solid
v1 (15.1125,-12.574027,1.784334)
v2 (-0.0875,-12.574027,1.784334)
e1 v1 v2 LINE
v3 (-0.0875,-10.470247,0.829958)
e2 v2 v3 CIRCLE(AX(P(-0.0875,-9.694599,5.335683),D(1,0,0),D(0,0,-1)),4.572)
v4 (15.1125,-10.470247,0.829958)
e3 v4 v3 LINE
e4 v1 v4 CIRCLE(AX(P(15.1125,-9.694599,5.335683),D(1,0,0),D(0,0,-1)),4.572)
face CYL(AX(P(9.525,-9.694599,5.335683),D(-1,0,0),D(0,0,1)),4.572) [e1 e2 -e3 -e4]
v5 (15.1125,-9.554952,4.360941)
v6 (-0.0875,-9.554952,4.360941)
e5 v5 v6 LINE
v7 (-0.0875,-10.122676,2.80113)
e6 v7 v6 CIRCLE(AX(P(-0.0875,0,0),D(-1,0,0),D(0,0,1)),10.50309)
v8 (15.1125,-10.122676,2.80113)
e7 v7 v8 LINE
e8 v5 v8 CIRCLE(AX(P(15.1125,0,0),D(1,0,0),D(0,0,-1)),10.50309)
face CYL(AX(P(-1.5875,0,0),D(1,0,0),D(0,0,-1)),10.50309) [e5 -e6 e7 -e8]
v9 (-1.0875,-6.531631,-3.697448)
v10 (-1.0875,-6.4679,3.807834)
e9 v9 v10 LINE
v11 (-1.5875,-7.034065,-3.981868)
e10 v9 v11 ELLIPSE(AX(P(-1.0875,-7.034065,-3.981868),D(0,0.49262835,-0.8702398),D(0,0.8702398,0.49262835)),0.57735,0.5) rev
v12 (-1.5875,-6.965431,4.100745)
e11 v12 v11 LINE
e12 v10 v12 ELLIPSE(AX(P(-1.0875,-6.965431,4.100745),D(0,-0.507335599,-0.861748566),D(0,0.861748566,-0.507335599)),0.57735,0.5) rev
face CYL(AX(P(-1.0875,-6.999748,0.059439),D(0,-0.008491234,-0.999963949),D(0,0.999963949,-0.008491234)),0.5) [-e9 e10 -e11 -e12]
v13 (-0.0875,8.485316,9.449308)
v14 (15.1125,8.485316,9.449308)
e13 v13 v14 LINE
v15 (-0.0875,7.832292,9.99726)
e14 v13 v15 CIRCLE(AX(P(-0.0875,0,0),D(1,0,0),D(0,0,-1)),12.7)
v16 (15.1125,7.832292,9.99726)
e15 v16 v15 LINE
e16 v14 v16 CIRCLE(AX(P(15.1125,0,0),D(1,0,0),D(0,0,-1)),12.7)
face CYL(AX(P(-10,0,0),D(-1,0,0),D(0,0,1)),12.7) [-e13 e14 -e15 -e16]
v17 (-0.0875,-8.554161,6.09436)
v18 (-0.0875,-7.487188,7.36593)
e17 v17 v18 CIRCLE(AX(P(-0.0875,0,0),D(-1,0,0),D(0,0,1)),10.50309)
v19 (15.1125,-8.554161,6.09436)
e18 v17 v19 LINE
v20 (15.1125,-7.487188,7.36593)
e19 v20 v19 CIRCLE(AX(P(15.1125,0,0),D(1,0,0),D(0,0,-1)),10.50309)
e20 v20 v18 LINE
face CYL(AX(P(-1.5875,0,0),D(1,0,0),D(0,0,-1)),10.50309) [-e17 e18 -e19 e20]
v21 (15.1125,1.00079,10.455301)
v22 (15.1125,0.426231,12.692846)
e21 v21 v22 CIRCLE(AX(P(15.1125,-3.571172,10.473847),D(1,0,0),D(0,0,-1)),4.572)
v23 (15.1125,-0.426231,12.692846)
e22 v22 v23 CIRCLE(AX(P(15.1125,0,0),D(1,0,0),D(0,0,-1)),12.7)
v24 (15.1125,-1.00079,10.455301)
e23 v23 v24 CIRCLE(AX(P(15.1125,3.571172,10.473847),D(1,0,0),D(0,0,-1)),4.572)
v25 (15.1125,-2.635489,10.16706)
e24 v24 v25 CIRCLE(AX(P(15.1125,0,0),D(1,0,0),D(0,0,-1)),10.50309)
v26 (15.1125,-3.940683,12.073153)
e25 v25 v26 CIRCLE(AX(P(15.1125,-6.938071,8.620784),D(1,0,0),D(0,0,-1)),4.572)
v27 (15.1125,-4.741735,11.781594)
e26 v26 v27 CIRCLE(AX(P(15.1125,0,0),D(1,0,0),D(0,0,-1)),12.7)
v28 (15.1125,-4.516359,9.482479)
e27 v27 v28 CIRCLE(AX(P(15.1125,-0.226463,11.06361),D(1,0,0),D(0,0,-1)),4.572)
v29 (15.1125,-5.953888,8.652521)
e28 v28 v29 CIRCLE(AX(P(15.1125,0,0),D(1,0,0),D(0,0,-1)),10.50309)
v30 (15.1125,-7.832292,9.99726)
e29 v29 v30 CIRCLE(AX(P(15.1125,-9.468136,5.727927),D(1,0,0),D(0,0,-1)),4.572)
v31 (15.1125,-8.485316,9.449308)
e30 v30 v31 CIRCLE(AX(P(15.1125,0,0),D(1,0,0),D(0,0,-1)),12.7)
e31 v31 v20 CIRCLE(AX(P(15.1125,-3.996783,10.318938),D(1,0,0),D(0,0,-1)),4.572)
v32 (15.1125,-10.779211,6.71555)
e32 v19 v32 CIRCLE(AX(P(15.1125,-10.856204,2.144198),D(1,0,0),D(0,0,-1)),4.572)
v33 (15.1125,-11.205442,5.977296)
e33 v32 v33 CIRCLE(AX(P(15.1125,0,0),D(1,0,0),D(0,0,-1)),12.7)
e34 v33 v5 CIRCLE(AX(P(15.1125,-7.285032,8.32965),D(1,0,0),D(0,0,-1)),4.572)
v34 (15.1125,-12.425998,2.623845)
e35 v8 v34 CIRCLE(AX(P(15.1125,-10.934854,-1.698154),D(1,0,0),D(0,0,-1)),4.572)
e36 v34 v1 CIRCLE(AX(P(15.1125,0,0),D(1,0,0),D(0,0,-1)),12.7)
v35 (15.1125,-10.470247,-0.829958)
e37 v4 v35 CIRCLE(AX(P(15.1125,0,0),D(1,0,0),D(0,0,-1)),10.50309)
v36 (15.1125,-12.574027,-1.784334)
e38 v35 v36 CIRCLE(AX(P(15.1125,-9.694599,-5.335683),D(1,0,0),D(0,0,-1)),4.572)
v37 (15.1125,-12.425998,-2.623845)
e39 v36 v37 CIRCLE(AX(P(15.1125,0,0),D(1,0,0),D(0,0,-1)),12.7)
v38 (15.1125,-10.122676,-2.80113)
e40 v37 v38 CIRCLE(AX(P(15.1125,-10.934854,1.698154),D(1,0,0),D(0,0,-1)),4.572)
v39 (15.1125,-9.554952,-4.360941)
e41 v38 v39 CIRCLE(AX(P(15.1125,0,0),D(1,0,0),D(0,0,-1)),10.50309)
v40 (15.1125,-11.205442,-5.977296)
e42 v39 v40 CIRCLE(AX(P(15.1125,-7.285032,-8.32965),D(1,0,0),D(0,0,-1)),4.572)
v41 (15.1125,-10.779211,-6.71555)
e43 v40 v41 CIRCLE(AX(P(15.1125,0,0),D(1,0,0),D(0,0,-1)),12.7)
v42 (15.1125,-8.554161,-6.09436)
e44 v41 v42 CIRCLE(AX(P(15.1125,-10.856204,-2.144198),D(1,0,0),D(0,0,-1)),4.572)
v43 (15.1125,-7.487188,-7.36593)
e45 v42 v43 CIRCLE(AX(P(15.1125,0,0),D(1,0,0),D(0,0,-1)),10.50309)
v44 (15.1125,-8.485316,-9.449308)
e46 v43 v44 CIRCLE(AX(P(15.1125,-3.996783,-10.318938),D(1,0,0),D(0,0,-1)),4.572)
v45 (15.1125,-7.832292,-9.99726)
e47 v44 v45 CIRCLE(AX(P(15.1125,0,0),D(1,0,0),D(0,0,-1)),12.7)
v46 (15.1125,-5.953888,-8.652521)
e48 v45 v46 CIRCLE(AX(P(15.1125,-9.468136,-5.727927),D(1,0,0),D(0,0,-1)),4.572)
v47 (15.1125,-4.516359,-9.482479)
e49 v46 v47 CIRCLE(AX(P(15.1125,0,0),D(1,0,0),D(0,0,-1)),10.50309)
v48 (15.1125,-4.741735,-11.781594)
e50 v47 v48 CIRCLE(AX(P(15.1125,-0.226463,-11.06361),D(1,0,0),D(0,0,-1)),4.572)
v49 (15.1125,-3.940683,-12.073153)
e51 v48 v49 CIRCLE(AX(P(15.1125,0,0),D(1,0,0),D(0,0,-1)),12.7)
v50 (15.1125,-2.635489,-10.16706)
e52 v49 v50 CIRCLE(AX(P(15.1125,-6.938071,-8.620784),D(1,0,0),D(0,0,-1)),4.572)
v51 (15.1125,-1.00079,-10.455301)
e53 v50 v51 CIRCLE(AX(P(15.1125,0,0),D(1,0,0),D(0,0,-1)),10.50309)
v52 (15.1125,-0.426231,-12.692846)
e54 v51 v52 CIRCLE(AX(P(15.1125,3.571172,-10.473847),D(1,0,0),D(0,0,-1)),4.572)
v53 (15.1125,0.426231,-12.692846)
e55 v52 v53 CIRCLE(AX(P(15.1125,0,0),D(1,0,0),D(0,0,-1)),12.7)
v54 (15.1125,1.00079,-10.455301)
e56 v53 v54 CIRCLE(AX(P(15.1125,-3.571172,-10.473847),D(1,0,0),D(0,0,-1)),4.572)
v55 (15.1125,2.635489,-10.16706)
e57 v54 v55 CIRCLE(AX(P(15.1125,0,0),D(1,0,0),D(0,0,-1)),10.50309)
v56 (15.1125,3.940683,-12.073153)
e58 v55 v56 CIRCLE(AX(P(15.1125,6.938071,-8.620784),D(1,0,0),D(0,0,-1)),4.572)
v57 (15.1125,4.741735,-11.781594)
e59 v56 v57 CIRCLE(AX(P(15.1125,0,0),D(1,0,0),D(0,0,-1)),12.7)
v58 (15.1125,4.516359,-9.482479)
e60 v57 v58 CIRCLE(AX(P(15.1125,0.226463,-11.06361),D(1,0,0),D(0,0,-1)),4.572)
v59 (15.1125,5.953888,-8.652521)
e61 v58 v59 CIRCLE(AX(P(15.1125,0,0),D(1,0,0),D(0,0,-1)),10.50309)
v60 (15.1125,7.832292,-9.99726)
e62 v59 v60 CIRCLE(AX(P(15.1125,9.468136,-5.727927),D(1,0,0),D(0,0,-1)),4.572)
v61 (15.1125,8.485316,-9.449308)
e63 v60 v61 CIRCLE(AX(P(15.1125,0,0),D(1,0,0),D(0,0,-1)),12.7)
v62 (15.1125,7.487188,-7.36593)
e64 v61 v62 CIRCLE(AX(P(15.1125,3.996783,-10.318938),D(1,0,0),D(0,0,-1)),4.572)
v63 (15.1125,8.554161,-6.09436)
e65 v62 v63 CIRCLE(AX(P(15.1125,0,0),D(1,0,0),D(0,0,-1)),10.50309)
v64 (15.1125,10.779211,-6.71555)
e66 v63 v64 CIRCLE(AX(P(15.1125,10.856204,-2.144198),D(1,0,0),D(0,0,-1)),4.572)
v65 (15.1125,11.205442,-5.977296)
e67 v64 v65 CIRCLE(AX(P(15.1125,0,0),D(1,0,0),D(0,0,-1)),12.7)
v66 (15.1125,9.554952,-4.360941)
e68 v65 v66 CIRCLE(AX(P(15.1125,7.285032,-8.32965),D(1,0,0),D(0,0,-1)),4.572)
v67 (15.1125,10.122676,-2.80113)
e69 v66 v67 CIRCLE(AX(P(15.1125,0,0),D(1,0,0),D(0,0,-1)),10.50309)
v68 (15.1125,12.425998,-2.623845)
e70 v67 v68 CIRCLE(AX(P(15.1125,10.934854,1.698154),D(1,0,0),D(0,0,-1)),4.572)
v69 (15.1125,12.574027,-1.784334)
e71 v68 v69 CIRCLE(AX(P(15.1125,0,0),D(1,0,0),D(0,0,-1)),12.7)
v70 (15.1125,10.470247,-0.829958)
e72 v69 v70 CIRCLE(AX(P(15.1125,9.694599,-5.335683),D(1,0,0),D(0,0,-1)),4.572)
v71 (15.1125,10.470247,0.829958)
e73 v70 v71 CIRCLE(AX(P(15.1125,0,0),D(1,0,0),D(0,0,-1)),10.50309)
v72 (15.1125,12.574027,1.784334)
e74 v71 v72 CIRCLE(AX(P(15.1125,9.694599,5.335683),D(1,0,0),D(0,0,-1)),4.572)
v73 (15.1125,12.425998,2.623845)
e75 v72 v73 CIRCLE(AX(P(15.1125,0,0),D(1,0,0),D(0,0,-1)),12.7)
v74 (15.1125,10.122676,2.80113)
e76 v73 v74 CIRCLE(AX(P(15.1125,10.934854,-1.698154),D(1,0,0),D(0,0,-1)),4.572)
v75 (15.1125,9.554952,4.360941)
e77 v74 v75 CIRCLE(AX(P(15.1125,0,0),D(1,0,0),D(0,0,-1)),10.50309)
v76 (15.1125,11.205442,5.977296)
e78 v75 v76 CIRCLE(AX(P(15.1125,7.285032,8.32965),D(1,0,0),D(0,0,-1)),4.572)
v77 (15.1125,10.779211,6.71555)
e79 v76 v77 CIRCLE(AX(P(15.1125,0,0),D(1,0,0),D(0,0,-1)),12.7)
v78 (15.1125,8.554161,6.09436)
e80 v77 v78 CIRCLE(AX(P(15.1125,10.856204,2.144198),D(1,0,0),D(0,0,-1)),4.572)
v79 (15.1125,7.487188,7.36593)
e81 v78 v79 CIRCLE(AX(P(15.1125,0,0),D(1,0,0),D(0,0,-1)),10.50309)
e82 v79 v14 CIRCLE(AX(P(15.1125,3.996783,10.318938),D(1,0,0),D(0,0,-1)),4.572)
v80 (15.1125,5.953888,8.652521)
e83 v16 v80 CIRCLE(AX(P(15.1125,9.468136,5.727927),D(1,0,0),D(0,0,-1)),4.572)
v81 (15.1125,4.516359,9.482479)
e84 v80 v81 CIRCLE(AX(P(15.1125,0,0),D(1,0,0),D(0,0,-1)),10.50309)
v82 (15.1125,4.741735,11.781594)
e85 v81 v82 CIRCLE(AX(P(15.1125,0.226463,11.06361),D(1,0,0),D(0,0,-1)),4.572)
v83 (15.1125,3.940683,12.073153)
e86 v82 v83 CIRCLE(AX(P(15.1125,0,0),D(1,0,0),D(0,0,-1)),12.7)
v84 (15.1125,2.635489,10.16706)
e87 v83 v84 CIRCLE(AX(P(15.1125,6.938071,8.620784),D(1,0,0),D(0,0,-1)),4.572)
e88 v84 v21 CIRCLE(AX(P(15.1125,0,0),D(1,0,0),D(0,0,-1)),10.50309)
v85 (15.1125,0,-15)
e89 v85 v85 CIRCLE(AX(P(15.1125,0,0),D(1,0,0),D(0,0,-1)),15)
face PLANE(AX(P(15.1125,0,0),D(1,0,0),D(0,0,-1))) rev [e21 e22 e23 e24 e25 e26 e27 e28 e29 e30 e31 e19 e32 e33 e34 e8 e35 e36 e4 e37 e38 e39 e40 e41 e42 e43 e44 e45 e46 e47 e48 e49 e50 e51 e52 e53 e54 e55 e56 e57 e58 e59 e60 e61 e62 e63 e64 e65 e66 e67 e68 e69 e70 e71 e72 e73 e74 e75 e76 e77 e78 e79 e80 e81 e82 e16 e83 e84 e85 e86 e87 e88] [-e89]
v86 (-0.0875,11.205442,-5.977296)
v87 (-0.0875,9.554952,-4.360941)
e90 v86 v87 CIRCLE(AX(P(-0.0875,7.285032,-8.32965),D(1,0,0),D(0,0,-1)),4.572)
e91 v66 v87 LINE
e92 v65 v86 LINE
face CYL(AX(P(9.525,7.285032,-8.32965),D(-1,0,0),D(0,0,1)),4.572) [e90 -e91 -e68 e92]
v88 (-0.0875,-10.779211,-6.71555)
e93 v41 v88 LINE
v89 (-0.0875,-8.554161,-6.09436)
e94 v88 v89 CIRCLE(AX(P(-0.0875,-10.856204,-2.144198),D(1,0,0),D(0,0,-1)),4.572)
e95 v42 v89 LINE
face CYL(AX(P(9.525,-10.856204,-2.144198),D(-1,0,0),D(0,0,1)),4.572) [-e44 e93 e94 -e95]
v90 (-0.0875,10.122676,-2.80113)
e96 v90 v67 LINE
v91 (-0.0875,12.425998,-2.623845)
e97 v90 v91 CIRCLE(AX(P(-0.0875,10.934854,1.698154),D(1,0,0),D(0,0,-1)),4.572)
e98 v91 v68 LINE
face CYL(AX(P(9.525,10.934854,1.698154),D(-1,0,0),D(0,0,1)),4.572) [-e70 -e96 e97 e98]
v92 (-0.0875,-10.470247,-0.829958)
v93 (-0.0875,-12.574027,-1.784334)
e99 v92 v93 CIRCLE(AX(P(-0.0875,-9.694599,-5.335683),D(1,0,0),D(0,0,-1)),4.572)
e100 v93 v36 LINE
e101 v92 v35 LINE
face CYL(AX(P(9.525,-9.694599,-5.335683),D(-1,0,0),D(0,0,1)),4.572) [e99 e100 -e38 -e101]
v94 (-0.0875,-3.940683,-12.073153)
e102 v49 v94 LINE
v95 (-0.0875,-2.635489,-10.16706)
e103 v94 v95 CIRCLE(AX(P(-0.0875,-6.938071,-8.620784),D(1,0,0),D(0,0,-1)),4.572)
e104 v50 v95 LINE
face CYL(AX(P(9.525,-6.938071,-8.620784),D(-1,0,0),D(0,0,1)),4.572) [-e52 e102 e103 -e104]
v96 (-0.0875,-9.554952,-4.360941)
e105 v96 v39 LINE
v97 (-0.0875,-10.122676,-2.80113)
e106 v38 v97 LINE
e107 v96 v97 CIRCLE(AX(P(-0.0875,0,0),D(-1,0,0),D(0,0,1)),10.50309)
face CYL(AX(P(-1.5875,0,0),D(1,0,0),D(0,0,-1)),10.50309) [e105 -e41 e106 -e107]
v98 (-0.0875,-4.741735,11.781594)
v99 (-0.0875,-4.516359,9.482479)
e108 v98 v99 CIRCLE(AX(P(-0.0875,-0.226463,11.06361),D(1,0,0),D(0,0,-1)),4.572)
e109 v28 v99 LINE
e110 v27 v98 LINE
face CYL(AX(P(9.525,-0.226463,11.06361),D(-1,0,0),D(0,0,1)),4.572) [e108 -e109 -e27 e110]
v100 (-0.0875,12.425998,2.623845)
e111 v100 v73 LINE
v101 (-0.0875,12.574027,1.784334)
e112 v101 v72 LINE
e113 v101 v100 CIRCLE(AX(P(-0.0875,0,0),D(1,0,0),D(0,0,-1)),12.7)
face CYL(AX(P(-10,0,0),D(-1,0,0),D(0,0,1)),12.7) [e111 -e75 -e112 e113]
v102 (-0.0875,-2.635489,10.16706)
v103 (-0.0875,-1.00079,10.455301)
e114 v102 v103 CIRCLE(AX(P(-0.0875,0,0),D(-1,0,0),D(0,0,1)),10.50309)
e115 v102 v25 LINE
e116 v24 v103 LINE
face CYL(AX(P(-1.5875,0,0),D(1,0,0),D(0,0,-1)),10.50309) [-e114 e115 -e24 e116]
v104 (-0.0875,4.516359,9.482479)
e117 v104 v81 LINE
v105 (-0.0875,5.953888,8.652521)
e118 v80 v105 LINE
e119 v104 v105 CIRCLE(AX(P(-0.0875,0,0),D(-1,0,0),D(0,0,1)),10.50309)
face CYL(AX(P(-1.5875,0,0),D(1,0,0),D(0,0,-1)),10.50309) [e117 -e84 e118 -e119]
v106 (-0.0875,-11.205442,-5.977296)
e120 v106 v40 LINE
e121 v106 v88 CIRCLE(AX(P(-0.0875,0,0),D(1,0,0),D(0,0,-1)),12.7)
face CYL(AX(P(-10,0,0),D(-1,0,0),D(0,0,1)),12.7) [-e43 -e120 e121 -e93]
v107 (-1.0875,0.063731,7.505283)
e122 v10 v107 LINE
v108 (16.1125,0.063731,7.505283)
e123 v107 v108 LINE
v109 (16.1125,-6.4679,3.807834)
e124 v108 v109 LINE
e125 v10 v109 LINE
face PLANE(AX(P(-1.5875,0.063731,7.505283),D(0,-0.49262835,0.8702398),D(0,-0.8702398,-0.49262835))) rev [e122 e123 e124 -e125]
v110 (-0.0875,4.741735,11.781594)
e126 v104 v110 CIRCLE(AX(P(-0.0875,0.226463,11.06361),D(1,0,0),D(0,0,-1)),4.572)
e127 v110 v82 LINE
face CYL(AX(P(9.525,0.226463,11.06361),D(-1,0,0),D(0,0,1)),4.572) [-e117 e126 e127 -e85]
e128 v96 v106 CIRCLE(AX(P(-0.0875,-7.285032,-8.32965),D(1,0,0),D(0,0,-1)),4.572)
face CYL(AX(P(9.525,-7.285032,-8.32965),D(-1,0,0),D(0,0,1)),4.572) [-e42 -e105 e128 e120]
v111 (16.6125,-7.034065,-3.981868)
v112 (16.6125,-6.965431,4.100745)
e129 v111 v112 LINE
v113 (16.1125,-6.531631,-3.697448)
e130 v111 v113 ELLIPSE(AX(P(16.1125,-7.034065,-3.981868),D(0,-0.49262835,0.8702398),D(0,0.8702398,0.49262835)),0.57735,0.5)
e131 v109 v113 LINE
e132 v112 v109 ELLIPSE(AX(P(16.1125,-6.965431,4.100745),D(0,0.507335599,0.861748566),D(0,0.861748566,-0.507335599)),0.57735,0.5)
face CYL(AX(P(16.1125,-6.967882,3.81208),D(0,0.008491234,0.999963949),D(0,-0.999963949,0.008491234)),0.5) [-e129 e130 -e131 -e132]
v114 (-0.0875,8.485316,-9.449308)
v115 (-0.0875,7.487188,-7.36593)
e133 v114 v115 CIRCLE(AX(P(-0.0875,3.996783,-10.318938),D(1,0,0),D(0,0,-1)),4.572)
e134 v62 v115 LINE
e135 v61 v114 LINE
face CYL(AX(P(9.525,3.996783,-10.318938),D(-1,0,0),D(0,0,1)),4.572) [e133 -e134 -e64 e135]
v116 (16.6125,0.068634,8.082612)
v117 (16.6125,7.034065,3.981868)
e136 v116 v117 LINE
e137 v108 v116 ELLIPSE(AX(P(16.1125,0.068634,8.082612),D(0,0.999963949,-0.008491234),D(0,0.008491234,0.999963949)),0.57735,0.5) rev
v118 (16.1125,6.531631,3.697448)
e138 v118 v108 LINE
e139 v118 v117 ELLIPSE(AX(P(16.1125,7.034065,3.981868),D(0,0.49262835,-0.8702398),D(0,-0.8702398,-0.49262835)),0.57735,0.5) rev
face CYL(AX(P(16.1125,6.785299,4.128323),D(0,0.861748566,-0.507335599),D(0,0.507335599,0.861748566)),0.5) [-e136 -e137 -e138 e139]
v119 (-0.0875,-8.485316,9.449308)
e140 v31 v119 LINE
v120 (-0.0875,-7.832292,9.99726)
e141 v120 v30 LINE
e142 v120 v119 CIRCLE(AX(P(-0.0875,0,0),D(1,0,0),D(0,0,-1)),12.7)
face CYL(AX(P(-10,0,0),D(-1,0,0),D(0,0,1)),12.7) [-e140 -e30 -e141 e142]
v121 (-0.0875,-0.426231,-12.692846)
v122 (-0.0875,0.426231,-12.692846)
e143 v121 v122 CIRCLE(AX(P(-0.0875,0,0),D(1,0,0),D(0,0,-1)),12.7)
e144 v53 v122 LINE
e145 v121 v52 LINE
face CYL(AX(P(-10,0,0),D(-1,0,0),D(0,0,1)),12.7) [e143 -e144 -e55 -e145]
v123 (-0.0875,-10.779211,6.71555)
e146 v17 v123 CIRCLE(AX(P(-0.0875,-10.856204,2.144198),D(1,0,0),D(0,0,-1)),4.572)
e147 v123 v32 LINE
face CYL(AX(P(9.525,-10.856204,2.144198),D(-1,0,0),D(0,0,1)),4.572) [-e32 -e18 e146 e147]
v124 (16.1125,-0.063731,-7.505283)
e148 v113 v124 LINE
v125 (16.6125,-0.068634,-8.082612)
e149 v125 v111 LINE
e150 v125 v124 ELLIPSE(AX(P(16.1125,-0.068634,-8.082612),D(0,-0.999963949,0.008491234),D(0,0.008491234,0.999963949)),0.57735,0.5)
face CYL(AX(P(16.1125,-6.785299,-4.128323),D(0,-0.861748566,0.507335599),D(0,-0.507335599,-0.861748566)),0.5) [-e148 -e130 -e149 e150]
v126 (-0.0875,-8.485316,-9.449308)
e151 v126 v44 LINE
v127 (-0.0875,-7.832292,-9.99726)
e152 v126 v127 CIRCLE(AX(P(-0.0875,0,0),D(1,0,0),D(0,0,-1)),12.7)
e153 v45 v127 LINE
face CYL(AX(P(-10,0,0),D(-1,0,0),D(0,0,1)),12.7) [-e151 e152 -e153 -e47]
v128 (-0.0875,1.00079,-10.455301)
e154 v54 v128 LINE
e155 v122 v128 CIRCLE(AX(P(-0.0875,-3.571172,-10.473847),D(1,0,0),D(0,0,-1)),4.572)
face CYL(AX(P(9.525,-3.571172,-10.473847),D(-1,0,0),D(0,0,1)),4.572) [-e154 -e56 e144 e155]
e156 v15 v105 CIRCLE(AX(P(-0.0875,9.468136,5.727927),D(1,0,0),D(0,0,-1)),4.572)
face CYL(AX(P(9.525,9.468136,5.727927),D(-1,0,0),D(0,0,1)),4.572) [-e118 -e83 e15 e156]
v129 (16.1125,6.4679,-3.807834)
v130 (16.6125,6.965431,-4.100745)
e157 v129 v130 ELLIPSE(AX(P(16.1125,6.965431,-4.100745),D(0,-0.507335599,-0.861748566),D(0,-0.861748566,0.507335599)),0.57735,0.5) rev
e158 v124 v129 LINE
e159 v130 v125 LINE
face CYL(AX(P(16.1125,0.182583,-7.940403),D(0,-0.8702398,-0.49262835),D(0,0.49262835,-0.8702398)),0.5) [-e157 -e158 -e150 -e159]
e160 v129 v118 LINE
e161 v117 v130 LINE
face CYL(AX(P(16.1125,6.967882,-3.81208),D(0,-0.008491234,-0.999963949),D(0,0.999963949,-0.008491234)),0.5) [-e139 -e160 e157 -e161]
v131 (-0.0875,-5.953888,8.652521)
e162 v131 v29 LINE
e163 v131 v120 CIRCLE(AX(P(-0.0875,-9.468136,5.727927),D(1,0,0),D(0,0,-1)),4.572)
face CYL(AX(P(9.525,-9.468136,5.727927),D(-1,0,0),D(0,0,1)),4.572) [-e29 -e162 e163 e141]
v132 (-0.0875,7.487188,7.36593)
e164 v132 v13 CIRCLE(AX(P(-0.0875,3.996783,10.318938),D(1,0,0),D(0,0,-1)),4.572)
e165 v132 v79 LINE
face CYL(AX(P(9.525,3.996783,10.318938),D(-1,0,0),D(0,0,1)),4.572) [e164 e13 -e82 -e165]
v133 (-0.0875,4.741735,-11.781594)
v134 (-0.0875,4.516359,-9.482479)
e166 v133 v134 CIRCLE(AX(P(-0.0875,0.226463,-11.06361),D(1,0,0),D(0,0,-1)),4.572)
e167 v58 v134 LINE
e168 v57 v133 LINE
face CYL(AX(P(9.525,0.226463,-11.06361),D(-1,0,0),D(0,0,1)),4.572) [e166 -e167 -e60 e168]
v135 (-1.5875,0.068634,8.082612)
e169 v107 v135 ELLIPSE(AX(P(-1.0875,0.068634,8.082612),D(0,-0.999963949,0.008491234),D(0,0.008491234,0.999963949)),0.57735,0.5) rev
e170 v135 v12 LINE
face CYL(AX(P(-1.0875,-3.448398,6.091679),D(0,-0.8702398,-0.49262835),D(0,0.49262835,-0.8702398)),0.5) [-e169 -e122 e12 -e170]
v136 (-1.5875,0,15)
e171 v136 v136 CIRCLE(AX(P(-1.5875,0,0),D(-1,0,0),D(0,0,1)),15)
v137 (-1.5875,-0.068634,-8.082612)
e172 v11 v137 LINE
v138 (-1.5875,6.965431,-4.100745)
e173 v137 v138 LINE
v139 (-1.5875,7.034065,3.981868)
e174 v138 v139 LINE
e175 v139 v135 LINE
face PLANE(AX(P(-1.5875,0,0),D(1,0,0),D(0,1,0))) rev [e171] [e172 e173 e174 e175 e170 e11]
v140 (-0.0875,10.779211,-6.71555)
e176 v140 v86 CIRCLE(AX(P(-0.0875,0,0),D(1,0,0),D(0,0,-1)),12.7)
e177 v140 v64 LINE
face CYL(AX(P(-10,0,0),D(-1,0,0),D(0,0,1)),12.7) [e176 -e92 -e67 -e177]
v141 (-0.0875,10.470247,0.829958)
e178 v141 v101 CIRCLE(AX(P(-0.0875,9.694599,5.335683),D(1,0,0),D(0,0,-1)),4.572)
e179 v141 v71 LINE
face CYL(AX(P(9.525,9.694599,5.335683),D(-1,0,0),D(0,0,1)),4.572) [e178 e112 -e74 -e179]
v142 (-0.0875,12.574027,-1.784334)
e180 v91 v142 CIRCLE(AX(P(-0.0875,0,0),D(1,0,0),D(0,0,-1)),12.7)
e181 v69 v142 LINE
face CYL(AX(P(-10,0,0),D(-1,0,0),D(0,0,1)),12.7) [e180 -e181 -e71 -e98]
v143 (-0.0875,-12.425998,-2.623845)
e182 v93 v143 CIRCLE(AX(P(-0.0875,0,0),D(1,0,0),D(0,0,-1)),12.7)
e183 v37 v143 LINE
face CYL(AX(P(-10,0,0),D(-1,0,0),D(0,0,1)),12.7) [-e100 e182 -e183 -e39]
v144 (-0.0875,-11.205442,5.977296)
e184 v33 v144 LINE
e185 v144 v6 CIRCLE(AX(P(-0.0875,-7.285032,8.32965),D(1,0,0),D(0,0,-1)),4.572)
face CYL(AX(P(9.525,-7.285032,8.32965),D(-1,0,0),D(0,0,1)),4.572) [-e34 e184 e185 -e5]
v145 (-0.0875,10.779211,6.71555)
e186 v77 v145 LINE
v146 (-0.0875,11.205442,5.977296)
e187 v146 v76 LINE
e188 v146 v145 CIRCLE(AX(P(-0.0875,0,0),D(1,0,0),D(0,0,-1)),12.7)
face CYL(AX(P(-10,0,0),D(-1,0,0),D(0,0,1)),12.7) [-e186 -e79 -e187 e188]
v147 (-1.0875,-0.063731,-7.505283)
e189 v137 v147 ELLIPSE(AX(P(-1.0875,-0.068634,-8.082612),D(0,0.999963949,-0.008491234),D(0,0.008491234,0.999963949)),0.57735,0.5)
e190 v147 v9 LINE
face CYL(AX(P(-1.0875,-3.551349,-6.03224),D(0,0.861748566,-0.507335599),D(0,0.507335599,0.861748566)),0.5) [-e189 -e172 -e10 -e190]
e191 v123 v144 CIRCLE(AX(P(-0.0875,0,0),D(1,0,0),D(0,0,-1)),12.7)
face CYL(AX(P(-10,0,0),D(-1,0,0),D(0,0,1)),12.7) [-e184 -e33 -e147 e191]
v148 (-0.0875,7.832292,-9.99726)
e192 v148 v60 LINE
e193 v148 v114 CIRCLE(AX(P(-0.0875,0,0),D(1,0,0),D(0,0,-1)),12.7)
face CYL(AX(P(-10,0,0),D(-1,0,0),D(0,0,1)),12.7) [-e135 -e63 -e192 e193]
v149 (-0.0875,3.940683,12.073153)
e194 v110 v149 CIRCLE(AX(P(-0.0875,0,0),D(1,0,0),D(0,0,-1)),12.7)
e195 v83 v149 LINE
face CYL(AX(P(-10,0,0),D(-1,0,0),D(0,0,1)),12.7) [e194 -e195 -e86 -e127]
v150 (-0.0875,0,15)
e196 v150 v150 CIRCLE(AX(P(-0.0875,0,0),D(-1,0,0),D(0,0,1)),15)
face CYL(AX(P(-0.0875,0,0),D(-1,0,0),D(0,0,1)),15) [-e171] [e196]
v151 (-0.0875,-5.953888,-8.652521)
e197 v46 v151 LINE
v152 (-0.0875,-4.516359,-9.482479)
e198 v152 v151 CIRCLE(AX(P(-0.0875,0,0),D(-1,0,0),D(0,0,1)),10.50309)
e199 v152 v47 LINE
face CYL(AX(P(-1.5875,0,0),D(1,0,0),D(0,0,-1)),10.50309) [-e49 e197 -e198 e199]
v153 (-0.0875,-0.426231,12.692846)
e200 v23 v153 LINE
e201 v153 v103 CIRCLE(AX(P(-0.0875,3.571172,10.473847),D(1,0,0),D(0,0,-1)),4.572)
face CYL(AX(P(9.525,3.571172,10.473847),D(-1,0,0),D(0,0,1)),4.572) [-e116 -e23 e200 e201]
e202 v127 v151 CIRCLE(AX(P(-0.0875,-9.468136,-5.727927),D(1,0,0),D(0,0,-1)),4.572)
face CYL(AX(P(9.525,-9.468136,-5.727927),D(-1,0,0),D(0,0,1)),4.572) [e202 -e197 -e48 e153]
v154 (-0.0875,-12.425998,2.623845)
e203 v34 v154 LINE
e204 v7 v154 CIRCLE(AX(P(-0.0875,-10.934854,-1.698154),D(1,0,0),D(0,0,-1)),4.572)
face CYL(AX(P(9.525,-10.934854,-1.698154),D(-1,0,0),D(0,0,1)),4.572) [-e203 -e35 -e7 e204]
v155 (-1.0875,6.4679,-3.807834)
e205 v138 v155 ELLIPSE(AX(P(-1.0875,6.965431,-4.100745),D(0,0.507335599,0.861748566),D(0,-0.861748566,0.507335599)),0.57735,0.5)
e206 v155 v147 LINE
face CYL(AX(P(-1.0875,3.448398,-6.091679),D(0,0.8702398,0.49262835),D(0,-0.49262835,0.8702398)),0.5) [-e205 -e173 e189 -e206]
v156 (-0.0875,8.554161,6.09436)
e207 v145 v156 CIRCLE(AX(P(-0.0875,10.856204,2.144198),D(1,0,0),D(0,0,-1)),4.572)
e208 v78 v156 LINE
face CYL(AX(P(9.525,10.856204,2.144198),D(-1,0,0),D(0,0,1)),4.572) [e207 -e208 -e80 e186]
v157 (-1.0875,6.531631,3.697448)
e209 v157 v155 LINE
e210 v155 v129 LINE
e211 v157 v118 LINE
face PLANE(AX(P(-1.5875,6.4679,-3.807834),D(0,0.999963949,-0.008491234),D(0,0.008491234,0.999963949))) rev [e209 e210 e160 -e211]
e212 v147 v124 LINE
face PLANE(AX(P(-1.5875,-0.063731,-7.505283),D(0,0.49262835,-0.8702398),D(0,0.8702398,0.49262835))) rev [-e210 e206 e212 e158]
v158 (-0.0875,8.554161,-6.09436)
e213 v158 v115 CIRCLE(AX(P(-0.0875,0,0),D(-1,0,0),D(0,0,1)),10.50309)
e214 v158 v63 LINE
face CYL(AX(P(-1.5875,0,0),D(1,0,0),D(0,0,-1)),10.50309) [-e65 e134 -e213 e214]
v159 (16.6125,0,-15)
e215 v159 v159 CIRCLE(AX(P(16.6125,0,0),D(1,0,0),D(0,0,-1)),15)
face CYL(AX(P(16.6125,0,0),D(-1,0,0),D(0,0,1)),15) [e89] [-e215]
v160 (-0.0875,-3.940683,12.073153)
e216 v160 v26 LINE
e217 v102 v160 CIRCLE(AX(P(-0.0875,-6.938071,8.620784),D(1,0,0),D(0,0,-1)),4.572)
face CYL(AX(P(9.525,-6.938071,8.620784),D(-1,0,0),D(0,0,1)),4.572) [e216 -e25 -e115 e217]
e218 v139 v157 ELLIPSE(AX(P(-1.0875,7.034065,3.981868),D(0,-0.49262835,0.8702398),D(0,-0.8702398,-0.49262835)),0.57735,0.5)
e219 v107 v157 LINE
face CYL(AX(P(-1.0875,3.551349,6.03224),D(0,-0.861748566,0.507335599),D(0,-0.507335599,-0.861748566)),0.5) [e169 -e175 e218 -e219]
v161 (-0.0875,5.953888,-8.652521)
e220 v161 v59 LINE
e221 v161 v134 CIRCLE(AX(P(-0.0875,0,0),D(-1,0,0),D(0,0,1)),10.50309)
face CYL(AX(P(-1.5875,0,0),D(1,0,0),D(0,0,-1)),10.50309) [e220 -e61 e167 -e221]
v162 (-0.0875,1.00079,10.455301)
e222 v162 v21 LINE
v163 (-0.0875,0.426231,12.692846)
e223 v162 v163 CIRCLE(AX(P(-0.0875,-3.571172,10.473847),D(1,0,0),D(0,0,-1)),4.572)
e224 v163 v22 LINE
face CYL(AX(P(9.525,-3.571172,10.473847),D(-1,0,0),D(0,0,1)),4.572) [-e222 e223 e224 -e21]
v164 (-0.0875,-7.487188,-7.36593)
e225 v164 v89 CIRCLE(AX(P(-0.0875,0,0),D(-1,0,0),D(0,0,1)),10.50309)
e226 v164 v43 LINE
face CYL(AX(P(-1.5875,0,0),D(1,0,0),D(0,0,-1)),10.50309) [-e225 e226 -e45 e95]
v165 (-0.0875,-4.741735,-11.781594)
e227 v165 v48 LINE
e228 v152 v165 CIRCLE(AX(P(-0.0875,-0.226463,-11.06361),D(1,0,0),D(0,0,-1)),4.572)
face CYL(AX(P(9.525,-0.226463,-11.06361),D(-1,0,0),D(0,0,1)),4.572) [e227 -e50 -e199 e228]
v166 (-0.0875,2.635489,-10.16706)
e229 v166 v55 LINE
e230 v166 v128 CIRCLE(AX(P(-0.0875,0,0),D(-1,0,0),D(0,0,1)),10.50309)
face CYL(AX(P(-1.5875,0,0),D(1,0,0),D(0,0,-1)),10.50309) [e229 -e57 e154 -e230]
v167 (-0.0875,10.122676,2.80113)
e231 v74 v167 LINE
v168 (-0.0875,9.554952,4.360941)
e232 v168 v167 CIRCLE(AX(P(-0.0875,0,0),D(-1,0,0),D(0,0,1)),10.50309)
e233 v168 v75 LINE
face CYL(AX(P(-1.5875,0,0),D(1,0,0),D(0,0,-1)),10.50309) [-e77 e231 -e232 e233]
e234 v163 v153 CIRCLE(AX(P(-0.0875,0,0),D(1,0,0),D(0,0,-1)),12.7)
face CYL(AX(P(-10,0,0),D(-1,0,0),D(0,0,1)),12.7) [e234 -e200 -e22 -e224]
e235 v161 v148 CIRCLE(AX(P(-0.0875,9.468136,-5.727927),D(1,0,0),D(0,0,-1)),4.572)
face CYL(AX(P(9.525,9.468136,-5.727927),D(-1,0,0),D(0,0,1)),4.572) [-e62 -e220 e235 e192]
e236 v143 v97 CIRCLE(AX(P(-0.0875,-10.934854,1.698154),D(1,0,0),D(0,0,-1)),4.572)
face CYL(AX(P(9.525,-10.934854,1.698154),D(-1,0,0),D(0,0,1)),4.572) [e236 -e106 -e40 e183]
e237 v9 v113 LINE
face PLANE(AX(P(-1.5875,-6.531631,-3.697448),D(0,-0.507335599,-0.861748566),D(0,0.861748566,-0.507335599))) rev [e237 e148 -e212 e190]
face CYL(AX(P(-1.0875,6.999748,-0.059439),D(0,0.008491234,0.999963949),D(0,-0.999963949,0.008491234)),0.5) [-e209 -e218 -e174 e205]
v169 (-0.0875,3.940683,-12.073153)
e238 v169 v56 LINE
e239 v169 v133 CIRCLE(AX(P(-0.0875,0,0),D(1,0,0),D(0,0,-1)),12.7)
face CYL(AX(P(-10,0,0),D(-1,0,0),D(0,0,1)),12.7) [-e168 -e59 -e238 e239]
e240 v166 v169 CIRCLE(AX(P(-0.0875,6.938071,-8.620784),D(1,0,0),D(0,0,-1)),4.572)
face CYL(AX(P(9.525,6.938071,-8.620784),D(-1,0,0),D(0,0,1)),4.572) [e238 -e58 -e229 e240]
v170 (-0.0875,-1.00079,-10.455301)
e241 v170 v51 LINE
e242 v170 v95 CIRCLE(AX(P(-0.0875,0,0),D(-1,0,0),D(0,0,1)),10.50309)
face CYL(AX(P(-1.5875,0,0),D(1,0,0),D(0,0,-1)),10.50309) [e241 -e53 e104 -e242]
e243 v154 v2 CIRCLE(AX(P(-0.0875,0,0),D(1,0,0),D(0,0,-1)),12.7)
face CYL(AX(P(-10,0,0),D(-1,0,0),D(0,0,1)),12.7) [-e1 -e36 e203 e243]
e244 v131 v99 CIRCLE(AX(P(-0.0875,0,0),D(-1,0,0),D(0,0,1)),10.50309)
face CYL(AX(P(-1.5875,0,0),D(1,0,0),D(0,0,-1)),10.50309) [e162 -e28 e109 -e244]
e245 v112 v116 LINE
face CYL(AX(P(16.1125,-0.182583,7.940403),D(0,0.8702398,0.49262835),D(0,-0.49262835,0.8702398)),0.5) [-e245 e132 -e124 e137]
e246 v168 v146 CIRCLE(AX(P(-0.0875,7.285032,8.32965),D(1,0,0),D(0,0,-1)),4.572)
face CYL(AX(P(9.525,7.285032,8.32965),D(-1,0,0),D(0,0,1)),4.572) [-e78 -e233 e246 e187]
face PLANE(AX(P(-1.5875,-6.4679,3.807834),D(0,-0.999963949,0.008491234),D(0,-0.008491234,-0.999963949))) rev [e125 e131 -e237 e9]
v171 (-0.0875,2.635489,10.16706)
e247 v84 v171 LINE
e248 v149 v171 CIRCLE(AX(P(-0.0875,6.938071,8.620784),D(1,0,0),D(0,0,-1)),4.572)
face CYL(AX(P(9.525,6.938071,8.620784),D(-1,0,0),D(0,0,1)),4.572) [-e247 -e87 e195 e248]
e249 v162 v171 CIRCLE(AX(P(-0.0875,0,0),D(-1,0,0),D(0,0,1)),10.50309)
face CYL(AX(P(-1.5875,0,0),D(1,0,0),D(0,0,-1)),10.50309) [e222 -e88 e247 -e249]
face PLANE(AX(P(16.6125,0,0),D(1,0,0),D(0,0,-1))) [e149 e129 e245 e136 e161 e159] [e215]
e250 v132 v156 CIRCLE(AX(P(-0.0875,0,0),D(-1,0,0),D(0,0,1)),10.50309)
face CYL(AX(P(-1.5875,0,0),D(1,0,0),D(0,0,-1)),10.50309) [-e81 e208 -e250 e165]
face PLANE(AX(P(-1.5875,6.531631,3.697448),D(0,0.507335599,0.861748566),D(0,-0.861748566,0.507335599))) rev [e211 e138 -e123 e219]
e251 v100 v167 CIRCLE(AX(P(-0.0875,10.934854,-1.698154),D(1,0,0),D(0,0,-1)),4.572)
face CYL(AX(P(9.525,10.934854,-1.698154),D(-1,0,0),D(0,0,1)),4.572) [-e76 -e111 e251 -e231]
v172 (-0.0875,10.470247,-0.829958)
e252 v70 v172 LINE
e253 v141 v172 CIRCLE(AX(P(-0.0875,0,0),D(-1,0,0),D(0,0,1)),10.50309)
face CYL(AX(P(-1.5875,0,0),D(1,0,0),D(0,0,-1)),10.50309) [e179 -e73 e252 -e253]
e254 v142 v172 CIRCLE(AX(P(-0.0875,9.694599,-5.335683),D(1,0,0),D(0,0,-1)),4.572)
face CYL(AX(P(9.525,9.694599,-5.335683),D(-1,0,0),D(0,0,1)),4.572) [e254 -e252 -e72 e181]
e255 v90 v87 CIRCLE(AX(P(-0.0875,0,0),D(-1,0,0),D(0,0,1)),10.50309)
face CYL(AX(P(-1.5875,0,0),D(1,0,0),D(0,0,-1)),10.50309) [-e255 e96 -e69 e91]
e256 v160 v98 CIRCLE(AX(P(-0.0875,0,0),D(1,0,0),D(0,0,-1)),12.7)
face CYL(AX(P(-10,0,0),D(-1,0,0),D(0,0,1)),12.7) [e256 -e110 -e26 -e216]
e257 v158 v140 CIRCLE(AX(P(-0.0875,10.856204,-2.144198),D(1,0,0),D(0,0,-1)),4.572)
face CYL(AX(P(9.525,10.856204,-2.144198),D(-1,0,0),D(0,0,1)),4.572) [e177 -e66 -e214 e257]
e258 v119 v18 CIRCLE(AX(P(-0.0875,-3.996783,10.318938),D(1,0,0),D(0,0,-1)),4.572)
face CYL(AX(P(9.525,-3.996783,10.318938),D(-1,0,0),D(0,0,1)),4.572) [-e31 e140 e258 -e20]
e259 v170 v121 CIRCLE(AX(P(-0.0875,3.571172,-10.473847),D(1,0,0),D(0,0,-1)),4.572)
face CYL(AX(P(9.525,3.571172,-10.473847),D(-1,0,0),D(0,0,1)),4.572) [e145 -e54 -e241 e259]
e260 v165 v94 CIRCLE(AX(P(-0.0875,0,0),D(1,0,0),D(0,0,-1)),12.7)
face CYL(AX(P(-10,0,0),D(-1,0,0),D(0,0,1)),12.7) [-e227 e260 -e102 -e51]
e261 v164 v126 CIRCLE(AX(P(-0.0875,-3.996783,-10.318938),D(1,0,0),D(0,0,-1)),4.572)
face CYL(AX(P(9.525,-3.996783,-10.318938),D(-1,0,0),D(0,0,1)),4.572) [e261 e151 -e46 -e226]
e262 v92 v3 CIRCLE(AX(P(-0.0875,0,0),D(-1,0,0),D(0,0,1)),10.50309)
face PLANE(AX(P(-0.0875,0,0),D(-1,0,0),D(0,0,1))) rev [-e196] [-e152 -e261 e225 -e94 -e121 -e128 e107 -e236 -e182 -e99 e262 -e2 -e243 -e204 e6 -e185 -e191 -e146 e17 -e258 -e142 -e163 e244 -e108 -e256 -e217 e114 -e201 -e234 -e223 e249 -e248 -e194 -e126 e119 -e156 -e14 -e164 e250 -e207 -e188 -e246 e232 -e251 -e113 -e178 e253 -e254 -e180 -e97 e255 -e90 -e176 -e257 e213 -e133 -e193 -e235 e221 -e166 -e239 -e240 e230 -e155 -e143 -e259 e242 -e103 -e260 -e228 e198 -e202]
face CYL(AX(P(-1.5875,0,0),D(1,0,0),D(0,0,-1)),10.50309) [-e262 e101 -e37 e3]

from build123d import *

# Parameters (mm, degrees)
BOSS_EXTRUDE1_START       = -11.2
BOSS_EXTRUDE1_DEPTH       = 15.2
BOSS_EXTRUDE1_START_2     = -11.30300619
BOSS_EXTRUDE1_2_OUTLINE_R = 9.525
BOSS_EXTRUDE1_2_DEPTH     = 0.10300619
BOSS_EXTRUDE1_START_3     = -1.5875
BOSS_EXTRUDE1_3_OUTLINE_R = 9.525
BOSS_EXTRUDE1_3_DEPTH     = 1.39699381
SKETCH2_R                 = 15
SKETCH2_R_2               = 7.854644271
BOSS_EXTRUDE2_DEPTH       = 1.5
SKETCH3_R                 = 15
SKETCH3_R_2               = 9.60106287
BOSS_EXTRUDE3_DEPTH       = 1.5
BOSS_EXTRUDE4_DEPTH       = 1.5
BOSS_EXTRUDE4_DEPTH_BACK  = 16.7
SKETCH5_R                 = 10.503090292
CUT_EXTRUDE1_DEPTH        = 28.950670833
FILLET1_R                 = 0.5
FILLET2_R                 = 0.5


with BuildPart() as part:
    # Boss-Extrude1: read off the stored shape, not the designer's step
    # Boss-Extrude1 outline → Boss-Extrude1 (new body)
    with BuildSketch(Plane(origin=(11.1125, 0, 0), x_dir=(0, 0, -1), z_dir=(1, 0, 0)).offset(BOSS_EXTRUDE1_START)):
        with BuildLine():
            ThreePointArc((12.692845514, 0.426230867), (11.294265748, 0.926615855), (9.809087715, 0.952242218))
            ThreePointArc((9.809087715, 0.952242218), (9.705477367, 1.71133752), (9.543213362, 2.4600906))
            ThreePointArc((9.543213362, 2.4600906), (10.930059468, 2.992132308), (12.073152809, 3.940682842))
            ThreePointArc((12.073152809, 3.940682842), (11.934096284, 4.34365582), (11.781593724, 4.741734842))
            ThreePointArc((11.781593724, 4.741734842), (10.296216892, 4.733600471), (8.891841322, 4.249720572))
            ThreePointArc((8.891841322, 4.249720572), (8.534853559, 4.9276), (8.126286635, 5.575700185))
            ThreePointArc((8.126286635, 5.575700185), (9.247526706, 6.549985156), (9.997259693, 7.832292041))
            ThreePointArc((9.997259693, 7.832292041), (9.728764428, 8.163402643), (9.449307854, 8.485315615))
            ThreePointArc((9.449307854, 8.485315615), (8.056292325, 7.96964301), (6.902107637, 7.034619905))
            ThreePointArc((6.902107637, 7.034619905), (6.334800451, 7.549521196), (5.729209809, 8.01879804))
            ThreePointArc((5.729209809, 8.01879804), (6.449605744, 9.317813127), (6.715549515, 10.779211228))
            ThreePointArc((6.715549515, 10.779211228), (6.35, 10.998522628), (5.977295999, 11.205442095))
            ThreePointArc((5.977295999, 11.205442095), (4.844660004, 10.244428982), (4.079877906, 8.971040258))
            ThreePointArc((4.079877906, 8.971040258), (3.370676917, 9.260858716), (2.641105726, 9.494710506))
            ThreePointArc((2.641105726, 9.494710506), (2.873767144, 10.961775319), (2.623844955, 12.425998457))
            ThreePointArc((2.623844955, 12.425998457), (2.205331856, 12.507058463), (1.784334031, 12.574026883))
            ThreePointArc((1.784334031, 12.574026883), (1.048690187, 11.283585627), (0.765554687, 9.825420757))
            ThreePointArc((0.765554687, 9.825420757), (0, 9.8552), (-0.765554687, 9.825420757))
            ThreePointArc((-0.765554687, 9.825420757), (-1.048690187, 11.283585627), (-1.784334031, 12.574026883))
            ThreePointArc((-1.784334031, 12.574026883), (-2.205331856, 12.507058463), (-2.623844955, 12.425998457))
            ThreePointArc((-2.623844955, 12.425998457), (-2.873767144, 10.961775319), (-2.641105726, 9.494710506))
            ThreePointArc((-2.641105726, 9.494710506), (-3.370676917, 9.260858716), (-4.079877906, 8.971040258))
            ThreePointArc((-4.079877906, 8.971040258), (-4.844660004, 10.244428982), (-5.977295999, 11.205442095))
            ThreePointArc((-5.977295999, 11.205442095), (-6.35, 10.998522628), (-6.715549515, 10.779211228))
            ThreePointArc((-6.715549515, 10.779211228), (-6.449605744, 9.317813127), (-5.729209809, 8.01879804))
            ThreePointArc((-5.729209809, 8.01879804), (-6.334800451, 7.549521196), (-6.902107637, 7.034619905))
            ThreePointArc((-6.902107637, 7.034619905), (-8.056292325, 7.96964301), (-9.449307854, 8.485315615))
            ThreePointArc((-9.449307854, 8.485315615), (-9.728764428, 8.163402643), (-9.997259693, 7.832292041))
            ThreePointArc((-9.997259693, 7.832292041), (-9.247526706, 6.549985156), (-8.126286635, 5.575700185))
            ThreePointArc((-8.126286635, 5.575700185), (-8.534853559, 4.9276), (-8.891841322, 4.249720572))
            ThreePointArc((-8.891841322, 4.249720572), (-10.296216892, 4.733600471), (-11.781593724, 4.741734842))
            ThreePointArc((-11.781593724, 4.741734842), (-11.934096284, 4.34365582), (-12.073152809, 3.940682842))
            ThreePointArc((-12.073152809, 3.940682842), (-10.930059468, 2.992132308), (-9.543213362, 2.4600906))
            ThreePointArc((-9.543213362, 2.4600906), (-9.705477367, 1.71133752), (-9.809087715, 0.952242218))
            ThreePointArc((-9.809087715, 0.952242218), (-11.294265748, 0.926615855), (-12.692845514, 0.426230867))
            ThreePointArc((-12.692845514, 0.426230867), (-12.7, 0), (-12.692845514, -0.426230867))
            ThreePointArc((-12.692845514, -0.426230867), (-11.294265748, -0.926615855), (-9.809087715, -0.952242218))
            ThreePointArc((-9.809087715, -0.952242218), (-9.705477367, -1.71133752), (-9.543213362, -2.4600906))
            ThreePointArc((-9.543213362, -2.4600906), (-10.930059468, -2.992132308), (-12.073152809, -3.940682842))
            ThreePointArc((-12.073152809, -3.940682842), (-11.934096284, -4.34365582), (-11.781593724, -4.741734842))
            ThreePointArc((-11.781593724, -4.741734842), (-10.296216892, -4.733600471), (-8.891841322, -4.249720572))
            ThreePointArc((-8.891841322, -4.249720572), (-8.534853559, -4.9276), (-8.126286635, -5.575700185))
            ThreePointArc((-8.126286635, -5.575700185), (-9.247526706, -6.549985156), (-9.997259693, -7.832292041))
            ThreePointArc((-9.997259693, -7.832292041), (-9.728764428, -8.163402643), (-9.449307854, -8.485315615))
            ThreePointArc((-9.449307854, -8.485315615), (-8.056292325, -7.96964301), (-6.902107637, -7.034619905))
            ThreePointArc((-6.902107637, -7.034619905), (-6.334800451, -7.549521196), (-5.729209809, -8.01879804))
            ThreePointArc((-5.729209809, -8.01879804), (-6.449605744, -9.317813127), (-6.715549515, -10.779211228))
            ThreePointArc((-6.715549515, -10.779211228), (-6.35, -10.998522628), (-5.977295999, -11.205442095))
            ThreePointArc((-5.977295999, -11.205442095), (-4.844660004, -10.244428982), (-4.079877906, -8.971040258))
            ThreePointArc((-4.079877906, -8.971040258), (-3.370676917, -9.260858716), (-2.641105726, -9.494710506))
            ThreePointArc((-2.641105726, -9.494710506), (-2.873767144, -10.961775319), (-2.623844955, -12.425998457))
            ThreePointArc((-2.623844955, -12.425998457), (-2.205331856, -12.507058463), (-1.784334031, -12.574026883))
            ThreePointArc((-1.784334031, -12.574026883), (-1.048690187, -11.283585627), (-0.765554687, -9.825420757))
            ThreePointArc((-0.765554687, -9.825420757), (0, -9.8552), (0.765554687, -9.825420757))
            ThreePointArc((0.765554687, -9.825420757), (1.048690187, -11.283585627), (1.784334031, -12.574026883))
            ThreePointArc((1.784334031, -12.574026883), (2.205331856, -12.507058463), (2.623844955, -12.425998457))
            ThreePointArc((2.623844955, -12.425998457), (2.873767144, -10.961775319), (2.641105726, -9.494710506))
            ThreePointArc((2.641105726, -9.494710506), (3.370676917, -9.260858716), (4.079877906, -8.971040258))
            ThreePointArc((4.079877906, -8.971040258), (4.844660004, -10.244428982), (5.977295999, -11.205442095))
            ThreePointArc((5.977295999, -11.205442095), (6.35, -10.998522628), (6.715549515, -10.779211228))
            ThreePointArc((6.715549515, -10.779211228), (6.449605744, -9.317813127), (5.729209809, -8.01879804))
            ThreePointArc((5.729209809, -8.01879804), (6.334800451, -7.549521196), (6.902107637, -7.034619905))
            ThreePointArc((6.902107637, -7.034619905), (8.056292325, -7.96964301), (9.449307854, -8.485315615))
            ThreePointArc((9.449307854, -8.485315615), (9.728764428, -8.163402643), (9.997259693, -7.832292041))
            ThreePointArc((9.997259693, -7.832292041), (9.247526706, -6.549985156), (8.126286635, -5.575700185))
            ThreePointArc((8.126286635, -5.575700185), (8.534853559, -4.9276), (8.891841322, -4.249720572))
            ThreePointArc((8.891841322, -4.249720572), (10.296216892, -4.733600471), (11.781593724, -4.741734842))
            ThreePointArc((11.781593724, -4.741734842), (11.934096284, -4.34365582), (12.073152809, -3.940682842))
            ThreePointArc((12.073152809, -3.940682842), (10.930059468, -2.992132308), (9.543213362, -2.4600906))
            ThreePointArc((9.543213362, -2.4600906), (9.705477367, -1.71133752), (9.809087715, -0.952242218))
            ThreePointArc((9.809087715, -0.952242218), (11.294265748, -0.926615855), (12.692845514, -0.426230867))
            ThreePointArc((12.692845514, -0.426230867), (12.7, 0), (12.692845514, 0.426230867))
        make_face()
        Polygon((3.666174209, 6.35), (7.332348419, 0), (3.666174209, -6.35), (-3.666174209, -6.35), (-7.332348419, 0), (-3.666174209, 6.35), align=None, mode=Mode.SUBTRACT)
    extrude(amount=BOSS_EXTRUDE1_DEPTH)

    # Boss-Extrude1 2 outline → Boss-Extrude1 2 (add)
    with BuildSketch(Plane(origin=(11.1125, 0, 0), x_dir=(0, 0, -1), z_dir=(1, 0, 0)).offset(BOSS_EXTRUDE1_START_2)):
        Circle(BOSS_EXTRUDE1_2_OUTLINE_R)
        Polygon((3.666174209, 6.35), (7.332348419, 0), (3.666174209, -6.35), (-3.666174209, -6.35), (-7.332348419, 0), (-3.666174209, 6.35), align=None, mode=Mode.SUBTRACT)
    extrude(amount=BOSS_EXTRUDE1_2_DEPTH)

    # Boss-Extrude1 3 outline → Boss-Extrude1 3 (add)
    with BuildSketch(Plane.YZ.offset(BOSS_EXTRUDE1_START_3)):
        Circle(BOSS_EXTRUDE1_3_OUTLINE_R)
        Polygon((6.35, -3.666174209), (0, -7.332348419), (-6.35, -3.666174209), (-6.35, 3.666174209), (0, 7.332348419), (6.35, 3.666174209), align=None, mode=Mode.SUBTRACT)
    extrude(amount=BOSS_EXTRUDE1_3_DEPTH)

    # Boss-Extrude1 4 outline → Boss-Extrude1 4 (revolve, cut)
    with BuildSketch(Plane.YX):
        Polygon((7.747, -1.5875), (6.34964944, -0.19014944), (6.34964944, -1.5875), align=None)
    revolve(axis=Axis((0, 0, 0), (1, 0, 0)), mode=Mode.SUBTRACT)

    # Sketch2 → Boss-Extrude2 (add)
    with BuildSketch(Plane(origin=(15.1125, 0, 0), x_dir=(0, 0, -1), z_dir=(1, 0, 0))):
        Circle(SKETCH2_R)
        Circle(SKETCH2_R_2, mode=Mode.SUBTRACT)
    extrude(amount=BOSS_EXTRUDE2_DEPTH)

    # Sketch3 → Boss-Extrude3 (add)
    with BuildSketch(Plane.ZY.offset(1.5875)):
        with Locations(Location((0, 0, 0), (0, 0, 180))):
            Circle(SKETCH3_R)
        Circle(SKETCH3_R_2, mode=Mode.SUBTRACT)
    extrude(amount=-BOSS_EXTRUDE3_DEPTH)

    # Sketch5 → Boss-Extrude4 (add, two sides: drawn at the far end of the back side and taken through both)
    with BuildSketch(Plane(origin=(15.1125, 0, 0), x_dir=(0, 0, -1), z_dir=(1, 0, 0)).offset(-BOSS_EXTRUDE4_DEPTH_BACK)):
        Circle(SKETCH5_R)
    extrude(amount=BOSS_EXTRUDE4_DEPTH + BOSS_EXTRUDE4_DEPTH_BACK)

    # Sketch4 → Cut-Extrude1 (cut, through all)
    with BuildSketch(Plane(origin=(16.6125, 0, 0), x_dir=(0, 0, -1), z_dir=(1, 0, 0))):
        Polygon((3.697448436, -6.531631373), (7.505282915, -0.063731412), (3.807834479, 6.467899962), (-3.697448436, 6.531631373), (-7.505282915, 0.063731412), (-3.807834479, -6.467899962), align=None)
    extrude(amount=-CUT_EXTRUDE1_DEPTH, mode=Mode.SUBTRACT)

    # Fillet1
    fillet1_edges = [part.edges().sort_by_distance(p)[0] for p in [
        (16.6125, -6.499765667, 0.055193021),
        (16.6125, -3.297681392, -5.601365676),
        (16.6125, 3.202084275, -5.656558697),
        (16.6125, 6.499765667, -0.055193021),
        (16.6125, 3.297681392, 5.601365676),
        (16.6125, -3.202084275, 5.656558697),
    ]]
    fillet(fillet1_edges, radius=FILLET1_R)

    # Fillet2
    fillet2_edges = [part.edges().sort_by_distance(p)[0] for p in [
        (-1.5875, -6.499765667, 0.055193021),
        (-1.5875, -3.202084275, 5.656558697),
        (-1.5875, 3.297681392, 5.601365676),
        (-1.5875, 6.499765667, -0.055193021),
        (-1.5875, 3.202084275, -5.656558697),
        (-1.5875, -3.297681392, -5.601365676),
    ]]
    fillet(fillet2_edges, radius=FILLET2_R)


solid = part.part
